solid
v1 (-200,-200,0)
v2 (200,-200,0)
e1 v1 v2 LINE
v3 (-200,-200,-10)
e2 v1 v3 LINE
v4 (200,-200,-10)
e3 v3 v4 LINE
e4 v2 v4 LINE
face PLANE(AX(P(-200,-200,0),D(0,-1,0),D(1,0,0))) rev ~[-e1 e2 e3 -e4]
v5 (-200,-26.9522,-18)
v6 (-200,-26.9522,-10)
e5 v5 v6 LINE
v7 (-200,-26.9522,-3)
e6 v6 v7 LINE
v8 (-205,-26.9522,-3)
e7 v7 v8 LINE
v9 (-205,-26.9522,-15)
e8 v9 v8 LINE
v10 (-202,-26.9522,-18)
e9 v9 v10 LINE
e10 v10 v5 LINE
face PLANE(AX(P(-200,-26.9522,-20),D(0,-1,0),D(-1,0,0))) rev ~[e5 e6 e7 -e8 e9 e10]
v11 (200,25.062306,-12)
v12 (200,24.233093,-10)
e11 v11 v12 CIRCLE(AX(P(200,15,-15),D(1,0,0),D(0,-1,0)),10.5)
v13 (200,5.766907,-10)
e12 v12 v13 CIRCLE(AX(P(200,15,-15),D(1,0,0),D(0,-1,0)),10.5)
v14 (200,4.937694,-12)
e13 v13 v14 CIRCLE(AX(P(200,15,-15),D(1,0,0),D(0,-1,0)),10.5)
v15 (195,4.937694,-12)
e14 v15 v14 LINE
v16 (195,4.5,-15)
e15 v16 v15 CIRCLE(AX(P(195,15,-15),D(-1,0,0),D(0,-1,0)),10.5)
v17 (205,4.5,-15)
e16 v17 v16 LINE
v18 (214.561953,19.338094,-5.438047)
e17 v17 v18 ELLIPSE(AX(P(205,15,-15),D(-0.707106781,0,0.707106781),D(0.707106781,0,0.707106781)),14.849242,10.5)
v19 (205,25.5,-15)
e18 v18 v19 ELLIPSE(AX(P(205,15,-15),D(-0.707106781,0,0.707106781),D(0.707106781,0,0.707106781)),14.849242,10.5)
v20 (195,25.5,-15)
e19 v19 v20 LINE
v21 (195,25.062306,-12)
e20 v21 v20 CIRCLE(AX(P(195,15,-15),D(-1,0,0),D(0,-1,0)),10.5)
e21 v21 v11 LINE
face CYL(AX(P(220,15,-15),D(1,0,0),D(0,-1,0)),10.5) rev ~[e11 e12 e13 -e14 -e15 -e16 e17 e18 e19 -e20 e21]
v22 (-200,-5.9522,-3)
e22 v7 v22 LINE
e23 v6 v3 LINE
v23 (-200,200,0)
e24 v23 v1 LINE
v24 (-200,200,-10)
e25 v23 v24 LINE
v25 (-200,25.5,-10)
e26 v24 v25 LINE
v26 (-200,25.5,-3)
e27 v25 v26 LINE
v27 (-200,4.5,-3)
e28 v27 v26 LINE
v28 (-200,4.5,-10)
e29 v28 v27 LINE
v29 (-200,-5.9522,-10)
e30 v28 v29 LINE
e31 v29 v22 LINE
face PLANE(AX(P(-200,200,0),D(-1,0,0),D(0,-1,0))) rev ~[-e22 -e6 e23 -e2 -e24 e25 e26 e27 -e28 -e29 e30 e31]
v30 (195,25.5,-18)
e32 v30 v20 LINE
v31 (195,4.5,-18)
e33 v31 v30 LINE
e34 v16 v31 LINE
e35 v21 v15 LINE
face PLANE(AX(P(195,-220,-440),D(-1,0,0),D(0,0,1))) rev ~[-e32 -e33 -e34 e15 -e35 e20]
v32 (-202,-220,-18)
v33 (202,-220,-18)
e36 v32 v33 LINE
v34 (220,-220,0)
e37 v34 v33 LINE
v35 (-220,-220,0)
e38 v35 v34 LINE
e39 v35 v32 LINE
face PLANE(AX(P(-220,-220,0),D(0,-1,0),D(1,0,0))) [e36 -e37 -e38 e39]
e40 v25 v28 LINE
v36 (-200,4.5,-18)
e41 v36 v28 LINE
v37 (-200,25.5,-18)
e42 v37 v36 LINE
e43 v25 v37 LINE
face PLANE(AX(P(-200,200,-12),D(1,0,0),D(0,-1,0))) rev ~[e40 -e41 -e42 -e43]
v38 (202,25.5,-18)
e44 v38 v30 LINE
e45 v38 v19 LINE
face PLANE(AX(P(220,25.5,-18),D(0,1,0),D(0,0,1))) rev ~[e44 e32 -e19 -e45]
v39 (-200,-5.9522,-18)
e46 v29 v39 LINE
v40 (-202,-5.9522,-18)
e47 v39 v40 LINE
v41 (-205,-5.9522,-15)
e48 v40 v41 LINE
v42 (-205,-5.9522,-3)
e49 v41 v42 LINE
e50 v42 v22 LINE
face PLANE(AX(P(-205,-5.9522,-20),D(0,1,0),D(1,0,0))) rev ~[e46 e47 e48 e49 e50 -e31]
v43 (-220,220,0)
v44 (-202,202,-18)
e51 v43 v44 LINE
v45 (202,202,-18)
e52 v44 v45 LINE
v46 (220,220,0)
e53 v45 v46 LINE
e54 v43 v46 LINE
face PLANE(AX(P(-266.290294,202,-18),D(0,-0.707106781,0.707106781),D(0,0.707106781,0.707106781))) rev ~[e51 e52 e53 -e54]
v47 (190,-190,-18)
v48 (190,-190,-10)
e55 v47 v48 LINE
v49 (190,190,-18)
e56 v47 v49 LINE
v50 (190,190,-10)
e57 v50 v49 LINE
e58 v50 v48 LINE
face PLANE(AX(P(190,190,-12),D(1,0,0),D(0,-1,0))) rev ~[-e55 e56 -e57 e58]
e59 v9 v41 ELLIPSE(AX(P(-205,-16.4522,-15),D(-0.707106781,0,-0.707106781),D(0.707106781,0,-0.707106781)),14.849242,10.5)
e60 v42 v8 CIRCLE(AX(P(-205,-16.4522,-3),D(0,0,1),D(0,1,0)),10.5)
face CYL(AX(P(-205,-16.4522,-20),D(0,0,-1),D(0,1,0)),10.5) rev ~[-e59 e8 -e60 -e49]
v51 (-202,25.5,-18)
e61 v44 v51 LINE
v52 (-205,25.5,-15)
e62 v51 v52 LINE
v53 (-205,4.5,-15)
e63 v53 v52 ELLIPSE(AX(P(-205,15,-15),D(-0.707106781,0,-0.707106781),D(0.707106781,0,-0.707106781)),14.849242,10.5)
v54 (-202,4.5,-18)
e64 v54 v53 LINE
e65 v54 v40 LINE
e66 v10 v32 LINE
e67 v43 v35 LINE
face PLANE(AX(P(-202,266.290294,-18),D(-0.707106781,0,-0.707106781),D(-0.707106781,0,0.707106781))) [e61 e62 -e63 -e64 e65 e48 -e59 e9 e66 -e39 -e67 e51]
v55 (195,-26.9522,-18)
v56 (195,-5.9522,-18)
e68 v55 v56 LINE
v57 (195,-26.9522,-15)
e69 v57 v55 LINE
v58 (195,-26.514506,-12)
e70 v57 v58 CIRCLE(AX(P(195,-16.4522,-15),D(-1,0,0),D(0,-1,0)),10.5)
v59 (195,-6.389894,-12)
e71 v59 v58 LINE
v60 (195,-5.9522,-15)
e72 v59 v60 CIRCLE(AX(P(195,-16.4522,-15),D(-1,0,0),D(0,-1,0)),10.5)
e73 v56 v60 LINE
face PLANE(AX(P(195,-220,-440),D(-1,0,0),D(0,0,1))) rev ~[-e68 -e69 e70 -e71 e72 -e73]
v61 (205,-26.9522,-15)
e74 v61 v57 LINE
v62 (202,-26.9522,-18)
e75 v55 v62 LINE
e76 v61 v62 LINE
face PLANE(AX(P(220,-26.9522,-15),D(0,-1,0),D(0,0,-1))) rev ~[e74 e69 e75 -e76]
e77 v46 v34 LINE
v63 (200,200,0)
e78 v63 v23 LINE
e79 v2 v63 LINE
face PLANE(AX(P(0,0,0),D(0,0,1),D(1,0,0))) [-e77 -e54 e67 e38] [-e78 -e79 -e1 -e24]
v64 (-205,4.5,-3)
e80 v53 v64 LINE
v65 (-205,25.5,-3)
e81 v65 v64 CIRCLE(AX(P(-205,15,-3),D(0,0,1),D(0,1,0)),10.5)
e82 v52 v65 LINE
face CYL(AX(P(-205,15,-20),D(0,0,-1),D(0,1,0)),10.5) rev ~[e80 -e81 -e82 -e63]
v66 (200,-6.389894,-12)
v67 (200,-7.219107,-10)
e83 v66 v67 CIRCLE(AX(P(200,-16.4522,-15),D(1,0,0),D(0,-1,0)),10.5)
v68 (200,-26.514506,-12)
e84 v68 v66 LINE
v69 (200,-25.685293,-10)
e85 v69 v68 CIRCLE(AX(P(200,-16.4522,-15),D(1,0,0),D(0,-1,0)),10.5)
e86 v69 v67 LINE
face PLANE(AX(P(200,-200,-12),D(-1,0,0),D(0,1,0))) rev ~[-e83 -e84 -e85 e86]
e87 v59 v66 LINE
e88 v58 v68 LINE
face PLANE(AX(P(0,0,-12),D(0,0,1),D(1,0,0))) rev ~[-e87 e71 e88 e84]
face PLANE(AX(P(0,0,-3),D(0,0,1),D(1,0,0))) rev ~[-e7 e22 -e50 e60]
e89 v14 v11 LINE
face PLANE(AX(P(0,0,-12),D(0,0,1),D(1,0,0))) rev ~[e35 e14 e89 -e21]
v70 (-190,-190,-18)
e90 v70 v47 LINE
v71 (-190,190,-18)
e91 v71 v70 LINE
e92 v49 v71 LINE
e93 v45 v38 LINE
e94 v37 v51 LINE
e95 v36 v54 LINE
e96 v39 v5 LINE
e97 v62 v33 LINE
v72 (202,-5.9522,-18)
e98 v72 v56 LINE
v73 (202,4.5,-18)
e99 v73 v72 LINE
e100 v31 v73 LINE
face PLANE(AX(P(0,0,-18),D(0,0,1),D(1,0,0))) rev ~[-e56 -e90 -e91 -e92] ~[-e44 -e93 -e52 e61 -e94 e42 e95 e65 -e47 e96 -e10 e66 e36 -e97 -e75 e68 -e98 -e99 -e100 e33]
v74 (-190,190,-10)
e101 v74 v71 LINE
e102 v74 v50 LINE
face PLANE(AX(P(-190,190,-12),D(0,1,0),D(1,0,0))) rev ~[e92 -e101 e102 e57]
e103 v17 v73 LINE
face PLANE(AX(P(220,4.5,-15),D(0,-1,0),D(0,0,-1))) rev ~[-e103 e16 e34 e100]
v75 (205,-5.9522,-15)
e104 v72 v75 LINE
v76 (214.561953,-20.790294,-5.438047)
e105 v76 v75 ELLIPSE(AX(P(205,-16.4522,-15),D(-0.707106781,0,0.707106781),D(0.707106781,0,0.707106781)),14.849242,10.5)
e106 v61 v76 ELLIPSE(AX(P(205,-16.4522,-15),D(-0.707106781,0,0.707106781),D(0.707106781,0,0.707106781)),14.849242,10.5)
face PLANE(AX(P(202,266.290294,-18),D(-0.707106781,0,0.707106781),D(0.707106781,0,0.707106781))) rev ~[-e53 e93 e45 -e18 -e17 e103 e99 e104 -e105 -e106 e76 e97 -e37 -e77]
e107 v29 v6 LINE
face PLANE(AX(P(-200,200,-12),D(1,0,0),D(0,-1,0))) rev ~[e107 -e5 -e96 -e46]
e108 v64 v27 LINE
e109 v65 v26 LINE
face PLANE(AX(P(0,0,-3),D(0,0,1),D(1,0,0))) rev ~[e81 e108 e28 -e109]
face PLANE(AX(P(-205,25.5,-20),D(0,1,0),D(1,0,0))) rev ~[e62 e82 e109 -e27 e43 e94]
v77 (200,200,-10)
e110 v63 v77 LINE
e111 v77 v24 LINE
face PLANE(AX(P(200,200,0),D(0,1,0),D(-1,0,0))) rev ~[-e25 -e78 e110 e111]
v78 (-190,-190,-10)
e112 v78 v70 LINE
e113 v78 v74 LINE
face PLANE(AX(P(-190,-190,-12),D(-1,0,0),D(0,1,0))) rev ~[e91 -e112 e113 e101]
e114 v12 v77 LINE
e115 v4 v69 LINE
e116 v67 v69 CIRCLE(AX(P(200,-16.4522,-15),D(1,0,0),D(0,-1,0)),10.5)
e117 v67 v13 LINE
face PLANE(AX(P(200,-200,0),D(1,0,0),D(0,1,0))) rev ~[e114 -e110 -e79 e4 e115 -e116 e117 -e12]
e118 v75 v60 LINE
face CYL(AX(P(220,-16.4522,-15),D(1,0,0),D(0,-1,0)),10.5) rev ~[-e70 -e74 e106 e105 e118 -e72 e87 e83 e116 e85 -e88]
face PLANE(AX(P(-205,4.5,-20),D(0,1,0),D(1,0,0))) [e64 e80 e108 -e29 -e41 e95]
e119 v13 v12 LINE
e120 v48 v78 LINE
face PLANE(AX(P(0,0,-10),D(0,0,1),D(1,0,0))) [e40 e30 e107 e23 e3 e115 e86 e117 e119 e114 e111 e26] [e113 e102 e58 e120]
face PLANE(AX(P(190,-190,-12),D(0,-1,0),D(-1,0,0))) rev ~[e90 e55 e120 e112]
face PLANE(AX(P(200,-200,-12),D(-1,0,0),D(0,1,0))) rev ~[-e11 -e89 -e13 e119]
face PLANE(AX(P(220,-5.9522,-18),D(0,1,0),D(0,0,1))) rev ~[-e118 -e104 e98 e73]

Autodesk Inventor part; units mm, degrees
ref_plane "YZ Plane" through (0, 0, 0) normal (1, 0, 0) x (0, 1, 0)
ref_plane "XZ Plane" through (0, 0, 0) normal (0, 1, 0) x (-1, 0, 0)
ref_plane "XY Plane" through (0, 0, 0) normal (0, 0, 1) x (1, 0, 0)
sketch "Skizze1" plane through (0, 0, 0) normal (0, 0, 1) x (1, 0, 0)
  line L0 (-220, -220) -> (220, -220) projected
  line L1 (220, 220) -> (220, -220) projected
  line L2 (-220, 220) -> (-220, -220) projected
  line L3 (-220, 220) -> (220, 220) projected
  line L4 (200, 200) -> (-200, 200) projected
  line L5 (-200, 200) -> (-200, -200) projected
  line L6 (-200, -200) -> (200, -200) projected
  line L7 (200, -200) -> (200, 200) projected
  line L8 (220, -220) -> (-220, -220)
  line L9 (-220, -220) -> (-220, 220)
  line L10 (-220, 220) -> (220, 220)
  line L11 (220, 220) -> (220, -220)
  line L12 (200, -200) -> (-200, -200)
  line L13 (-200, -200) -> (-200, 200)
  line L14 (-200, 200) -> (200, 200)
  line L15 (200, 200) -> (200, -200)
  point P0 (0, 0)
extrude "Extrusion1" add sketch "Skizze1" against normal blind 18
ref_plane "Arbeitsebene1" through (0, 0, -20) normal (0, 0, 1) x (1, 0, 0)
sketch "Skizze3" plane through (0, 0, -20) normal (0, 0, 1) x (1, 0, 0)
  arc A0 (-205, 25.5) -> (-205, 4.5) centre (-205, 15) ccw projected
  arc A1 (-205, 25.5) -> (-205, 4.5) centre (-205, 15) ccw projected
  arc A2 (-205, -5.9522) -> (-205, -26.9522) centre (-205, -16.4522) ccw projected
  arc A3 (-205, -5.9522) -> (-205, -26.9522) centre (-205, -16.4522) ccw projected
  arc A4 (-205, -5.9522) -> (-205, -26.9522) centre (-205, -16.4522) ccw projected
  arc A5 (-205, -5.9522) -> (-205, -26.9522) centre (-205, -16.4522) ccw projected
  line L0 (-200, -26.9522) -> (-205, -26.9522) projected
  line L1 (-205, -5.9522) -> (-200, -5.9522) projected
  line L2 (-205, 4.5) -> (-200, 4.5)
  line L3 (-200, -200) -> (-200, 200) projected
  line L4 (-205, 25.5) -> (-200, 25.5)
  line L5 (-205, -5.9522) -> (-200, -5.9522)
  line L6 (-205, -26.9522) -> (-200, -26.9522)
  arc A6 (-205, 25.5) -> (-205, 4.5) centre (-205, 15) ccw
  arc A7 (-205, -5.9522) -> (-205, -26.9522) centre (-205, -16.4522) ccw
  point P0 (0, 0)
extrude "Extrusion2" cut sketch "Skizze3" along normal blind 17
sketch "Skizze5" plane through (0, 0, -20) normal (0, 0, 1) x (1, 0, 0)
  line L0 (-200, -26.9522) -> (-200, -200) projected
  line L1 (-200, -200) -> (200, -200) projected
  line L2 (200, -200) -> (200, 200) projected
  line L3 (-200, 200) -> (200, 200) projected
  line L4 (-200, -200) -> (200, -200)
  line L5 (200, -200) -> (200, 200)
  line L6 (200, 200) -> (-200, 200)
  line L7 (-200, 200) -> (-200, -200)
  line L8 (-190, -190) -> (190, -190)
  line L9 (190, -190) -> (190, 190)
  line L10 (190, 190) -> (-190, 190)
  line L11 (-190, 190) -> (-190, -190)
  point P0 (0, 0)
  dimension "d8" = 10
  dimension "d9" = 10
  dimension "d10" = 10
  dimension "d11" = 10
extrude "Extrusion3" add sketch "Skizze5" along normal blind 8
ref_plane "Arbeitsebene3" through (220, -220, -440) normal (-1, 0, 0) x (0, 0, 1)
sketch "Skizze6" plane through (220, -220, -440) normal (-1, 0, 0) x (0, 0, 1)
  arc A0 (425, 193.0478) -> (425, 214.0478) centre (425, 203.5478) ccw projected
  arc A1 (425, 224.5) -> (425, 245.5) centre (425, 235) ccw projected
  line L0 (425, 224.5) -> (422, 224.5) projected
  line L1 (422, 214.0478) -> (425, 214.0478) projected
  line L2 (425, 193.0478) -> (422, 193.0478) projected
  line L3 (422, 245.5) -> (425, 245.5) projected
  line L4 (422, 193.0478) -> (428, 193.0478) projected
  line L5 (422, 193.0478) -> (425, 193.0478)
  line L6 (422, 214.0478) -> (425, 214.0478)
  line L7 (428, 214.0478) -> (422, 214.0478) projected
  line L8 (420, 245.5) -> (420, 224.5) projected
  line L9 (422, 224.5) -> (425, 224.5)
  line L10 (422, 245.5) -> (425, 245.5)
  line L11 (420, 193.0478) -> (420, 20) projected
  line L12 (422, 193.0478) -> (422, 214.0478)
  line L13 (422, 224.5) -> (422, 245.5)
  arc A2 (425, 193.0478) -> (425, 214.0478) centre (425, 203.5478) ccw
  arc A3 (425, 224.5) -> (425, 245.5) centre (425, 235) ccw
  point P0 (440, 220)
  point P1 (420, 20)
extrude "Extrusion4" cut sketch "Skizze6" along normal blind 25
sketch "Skizze7" plane through (0, 0, -20) normal (0, 0, -1) x (-1, 0, 0)
  line L0 (190, 190) -> (190, -190) projected
  line L1 (190, -190) -> (-190, -190) projected
  line L2 (-190, -190) -> (-190, 190) projected
  line L3 (-190, 190) -> (190, 190) projected
  line L4 (200, -200) -> (-200, -200) projected
  line L5 (200, 200) -> (200, -200) projected
  line L6 (-200, 200) -> (200, 200) projected
  line L7 (-200, -200) -> (-200, 200) projected
  line L8 (-200, 200) -> (200, 200) projected
  line L9 (-190, -190) -> (-190, 190) projected
  point P0 (0, 0)
extrude "Extrusion5" cut sketch "Skizze7" against normal blind 2
sketch "Skizze8" plane through (0, 0, -12) normal (0, 0, 1) x (1, 0, 0)
  line L0 (-200, -200) -> (200, -200) projected
  line L1 (200, -200) -> (200, 200) projected
  line L2 (200, 200) -> (-200, 200) projected
  line L3 (-200, 200) -> (-200, -200) projected
  line L4 (190, -190) -> (-190, -190) projected
  line L5 (-190, -190) -> (-190, 190) projected
  line L6 (-190, 190) -> (190, 190) projected
  line L7 (190, 190) -> (190, -190) projected
  point P0 (0, 0)
extrude "Extrusion6" add sketch "Skizze8" along normal blind 2
chamfer "Fase2" distance 18 angle 45 5 edges at (220, 122.75, -18) (220, -123.4761, -18) (220, -0.7261, -18) (0, 220, -18) (-220, 0, -18)
properties part number "PV_Ramen_CPY_3_3"
